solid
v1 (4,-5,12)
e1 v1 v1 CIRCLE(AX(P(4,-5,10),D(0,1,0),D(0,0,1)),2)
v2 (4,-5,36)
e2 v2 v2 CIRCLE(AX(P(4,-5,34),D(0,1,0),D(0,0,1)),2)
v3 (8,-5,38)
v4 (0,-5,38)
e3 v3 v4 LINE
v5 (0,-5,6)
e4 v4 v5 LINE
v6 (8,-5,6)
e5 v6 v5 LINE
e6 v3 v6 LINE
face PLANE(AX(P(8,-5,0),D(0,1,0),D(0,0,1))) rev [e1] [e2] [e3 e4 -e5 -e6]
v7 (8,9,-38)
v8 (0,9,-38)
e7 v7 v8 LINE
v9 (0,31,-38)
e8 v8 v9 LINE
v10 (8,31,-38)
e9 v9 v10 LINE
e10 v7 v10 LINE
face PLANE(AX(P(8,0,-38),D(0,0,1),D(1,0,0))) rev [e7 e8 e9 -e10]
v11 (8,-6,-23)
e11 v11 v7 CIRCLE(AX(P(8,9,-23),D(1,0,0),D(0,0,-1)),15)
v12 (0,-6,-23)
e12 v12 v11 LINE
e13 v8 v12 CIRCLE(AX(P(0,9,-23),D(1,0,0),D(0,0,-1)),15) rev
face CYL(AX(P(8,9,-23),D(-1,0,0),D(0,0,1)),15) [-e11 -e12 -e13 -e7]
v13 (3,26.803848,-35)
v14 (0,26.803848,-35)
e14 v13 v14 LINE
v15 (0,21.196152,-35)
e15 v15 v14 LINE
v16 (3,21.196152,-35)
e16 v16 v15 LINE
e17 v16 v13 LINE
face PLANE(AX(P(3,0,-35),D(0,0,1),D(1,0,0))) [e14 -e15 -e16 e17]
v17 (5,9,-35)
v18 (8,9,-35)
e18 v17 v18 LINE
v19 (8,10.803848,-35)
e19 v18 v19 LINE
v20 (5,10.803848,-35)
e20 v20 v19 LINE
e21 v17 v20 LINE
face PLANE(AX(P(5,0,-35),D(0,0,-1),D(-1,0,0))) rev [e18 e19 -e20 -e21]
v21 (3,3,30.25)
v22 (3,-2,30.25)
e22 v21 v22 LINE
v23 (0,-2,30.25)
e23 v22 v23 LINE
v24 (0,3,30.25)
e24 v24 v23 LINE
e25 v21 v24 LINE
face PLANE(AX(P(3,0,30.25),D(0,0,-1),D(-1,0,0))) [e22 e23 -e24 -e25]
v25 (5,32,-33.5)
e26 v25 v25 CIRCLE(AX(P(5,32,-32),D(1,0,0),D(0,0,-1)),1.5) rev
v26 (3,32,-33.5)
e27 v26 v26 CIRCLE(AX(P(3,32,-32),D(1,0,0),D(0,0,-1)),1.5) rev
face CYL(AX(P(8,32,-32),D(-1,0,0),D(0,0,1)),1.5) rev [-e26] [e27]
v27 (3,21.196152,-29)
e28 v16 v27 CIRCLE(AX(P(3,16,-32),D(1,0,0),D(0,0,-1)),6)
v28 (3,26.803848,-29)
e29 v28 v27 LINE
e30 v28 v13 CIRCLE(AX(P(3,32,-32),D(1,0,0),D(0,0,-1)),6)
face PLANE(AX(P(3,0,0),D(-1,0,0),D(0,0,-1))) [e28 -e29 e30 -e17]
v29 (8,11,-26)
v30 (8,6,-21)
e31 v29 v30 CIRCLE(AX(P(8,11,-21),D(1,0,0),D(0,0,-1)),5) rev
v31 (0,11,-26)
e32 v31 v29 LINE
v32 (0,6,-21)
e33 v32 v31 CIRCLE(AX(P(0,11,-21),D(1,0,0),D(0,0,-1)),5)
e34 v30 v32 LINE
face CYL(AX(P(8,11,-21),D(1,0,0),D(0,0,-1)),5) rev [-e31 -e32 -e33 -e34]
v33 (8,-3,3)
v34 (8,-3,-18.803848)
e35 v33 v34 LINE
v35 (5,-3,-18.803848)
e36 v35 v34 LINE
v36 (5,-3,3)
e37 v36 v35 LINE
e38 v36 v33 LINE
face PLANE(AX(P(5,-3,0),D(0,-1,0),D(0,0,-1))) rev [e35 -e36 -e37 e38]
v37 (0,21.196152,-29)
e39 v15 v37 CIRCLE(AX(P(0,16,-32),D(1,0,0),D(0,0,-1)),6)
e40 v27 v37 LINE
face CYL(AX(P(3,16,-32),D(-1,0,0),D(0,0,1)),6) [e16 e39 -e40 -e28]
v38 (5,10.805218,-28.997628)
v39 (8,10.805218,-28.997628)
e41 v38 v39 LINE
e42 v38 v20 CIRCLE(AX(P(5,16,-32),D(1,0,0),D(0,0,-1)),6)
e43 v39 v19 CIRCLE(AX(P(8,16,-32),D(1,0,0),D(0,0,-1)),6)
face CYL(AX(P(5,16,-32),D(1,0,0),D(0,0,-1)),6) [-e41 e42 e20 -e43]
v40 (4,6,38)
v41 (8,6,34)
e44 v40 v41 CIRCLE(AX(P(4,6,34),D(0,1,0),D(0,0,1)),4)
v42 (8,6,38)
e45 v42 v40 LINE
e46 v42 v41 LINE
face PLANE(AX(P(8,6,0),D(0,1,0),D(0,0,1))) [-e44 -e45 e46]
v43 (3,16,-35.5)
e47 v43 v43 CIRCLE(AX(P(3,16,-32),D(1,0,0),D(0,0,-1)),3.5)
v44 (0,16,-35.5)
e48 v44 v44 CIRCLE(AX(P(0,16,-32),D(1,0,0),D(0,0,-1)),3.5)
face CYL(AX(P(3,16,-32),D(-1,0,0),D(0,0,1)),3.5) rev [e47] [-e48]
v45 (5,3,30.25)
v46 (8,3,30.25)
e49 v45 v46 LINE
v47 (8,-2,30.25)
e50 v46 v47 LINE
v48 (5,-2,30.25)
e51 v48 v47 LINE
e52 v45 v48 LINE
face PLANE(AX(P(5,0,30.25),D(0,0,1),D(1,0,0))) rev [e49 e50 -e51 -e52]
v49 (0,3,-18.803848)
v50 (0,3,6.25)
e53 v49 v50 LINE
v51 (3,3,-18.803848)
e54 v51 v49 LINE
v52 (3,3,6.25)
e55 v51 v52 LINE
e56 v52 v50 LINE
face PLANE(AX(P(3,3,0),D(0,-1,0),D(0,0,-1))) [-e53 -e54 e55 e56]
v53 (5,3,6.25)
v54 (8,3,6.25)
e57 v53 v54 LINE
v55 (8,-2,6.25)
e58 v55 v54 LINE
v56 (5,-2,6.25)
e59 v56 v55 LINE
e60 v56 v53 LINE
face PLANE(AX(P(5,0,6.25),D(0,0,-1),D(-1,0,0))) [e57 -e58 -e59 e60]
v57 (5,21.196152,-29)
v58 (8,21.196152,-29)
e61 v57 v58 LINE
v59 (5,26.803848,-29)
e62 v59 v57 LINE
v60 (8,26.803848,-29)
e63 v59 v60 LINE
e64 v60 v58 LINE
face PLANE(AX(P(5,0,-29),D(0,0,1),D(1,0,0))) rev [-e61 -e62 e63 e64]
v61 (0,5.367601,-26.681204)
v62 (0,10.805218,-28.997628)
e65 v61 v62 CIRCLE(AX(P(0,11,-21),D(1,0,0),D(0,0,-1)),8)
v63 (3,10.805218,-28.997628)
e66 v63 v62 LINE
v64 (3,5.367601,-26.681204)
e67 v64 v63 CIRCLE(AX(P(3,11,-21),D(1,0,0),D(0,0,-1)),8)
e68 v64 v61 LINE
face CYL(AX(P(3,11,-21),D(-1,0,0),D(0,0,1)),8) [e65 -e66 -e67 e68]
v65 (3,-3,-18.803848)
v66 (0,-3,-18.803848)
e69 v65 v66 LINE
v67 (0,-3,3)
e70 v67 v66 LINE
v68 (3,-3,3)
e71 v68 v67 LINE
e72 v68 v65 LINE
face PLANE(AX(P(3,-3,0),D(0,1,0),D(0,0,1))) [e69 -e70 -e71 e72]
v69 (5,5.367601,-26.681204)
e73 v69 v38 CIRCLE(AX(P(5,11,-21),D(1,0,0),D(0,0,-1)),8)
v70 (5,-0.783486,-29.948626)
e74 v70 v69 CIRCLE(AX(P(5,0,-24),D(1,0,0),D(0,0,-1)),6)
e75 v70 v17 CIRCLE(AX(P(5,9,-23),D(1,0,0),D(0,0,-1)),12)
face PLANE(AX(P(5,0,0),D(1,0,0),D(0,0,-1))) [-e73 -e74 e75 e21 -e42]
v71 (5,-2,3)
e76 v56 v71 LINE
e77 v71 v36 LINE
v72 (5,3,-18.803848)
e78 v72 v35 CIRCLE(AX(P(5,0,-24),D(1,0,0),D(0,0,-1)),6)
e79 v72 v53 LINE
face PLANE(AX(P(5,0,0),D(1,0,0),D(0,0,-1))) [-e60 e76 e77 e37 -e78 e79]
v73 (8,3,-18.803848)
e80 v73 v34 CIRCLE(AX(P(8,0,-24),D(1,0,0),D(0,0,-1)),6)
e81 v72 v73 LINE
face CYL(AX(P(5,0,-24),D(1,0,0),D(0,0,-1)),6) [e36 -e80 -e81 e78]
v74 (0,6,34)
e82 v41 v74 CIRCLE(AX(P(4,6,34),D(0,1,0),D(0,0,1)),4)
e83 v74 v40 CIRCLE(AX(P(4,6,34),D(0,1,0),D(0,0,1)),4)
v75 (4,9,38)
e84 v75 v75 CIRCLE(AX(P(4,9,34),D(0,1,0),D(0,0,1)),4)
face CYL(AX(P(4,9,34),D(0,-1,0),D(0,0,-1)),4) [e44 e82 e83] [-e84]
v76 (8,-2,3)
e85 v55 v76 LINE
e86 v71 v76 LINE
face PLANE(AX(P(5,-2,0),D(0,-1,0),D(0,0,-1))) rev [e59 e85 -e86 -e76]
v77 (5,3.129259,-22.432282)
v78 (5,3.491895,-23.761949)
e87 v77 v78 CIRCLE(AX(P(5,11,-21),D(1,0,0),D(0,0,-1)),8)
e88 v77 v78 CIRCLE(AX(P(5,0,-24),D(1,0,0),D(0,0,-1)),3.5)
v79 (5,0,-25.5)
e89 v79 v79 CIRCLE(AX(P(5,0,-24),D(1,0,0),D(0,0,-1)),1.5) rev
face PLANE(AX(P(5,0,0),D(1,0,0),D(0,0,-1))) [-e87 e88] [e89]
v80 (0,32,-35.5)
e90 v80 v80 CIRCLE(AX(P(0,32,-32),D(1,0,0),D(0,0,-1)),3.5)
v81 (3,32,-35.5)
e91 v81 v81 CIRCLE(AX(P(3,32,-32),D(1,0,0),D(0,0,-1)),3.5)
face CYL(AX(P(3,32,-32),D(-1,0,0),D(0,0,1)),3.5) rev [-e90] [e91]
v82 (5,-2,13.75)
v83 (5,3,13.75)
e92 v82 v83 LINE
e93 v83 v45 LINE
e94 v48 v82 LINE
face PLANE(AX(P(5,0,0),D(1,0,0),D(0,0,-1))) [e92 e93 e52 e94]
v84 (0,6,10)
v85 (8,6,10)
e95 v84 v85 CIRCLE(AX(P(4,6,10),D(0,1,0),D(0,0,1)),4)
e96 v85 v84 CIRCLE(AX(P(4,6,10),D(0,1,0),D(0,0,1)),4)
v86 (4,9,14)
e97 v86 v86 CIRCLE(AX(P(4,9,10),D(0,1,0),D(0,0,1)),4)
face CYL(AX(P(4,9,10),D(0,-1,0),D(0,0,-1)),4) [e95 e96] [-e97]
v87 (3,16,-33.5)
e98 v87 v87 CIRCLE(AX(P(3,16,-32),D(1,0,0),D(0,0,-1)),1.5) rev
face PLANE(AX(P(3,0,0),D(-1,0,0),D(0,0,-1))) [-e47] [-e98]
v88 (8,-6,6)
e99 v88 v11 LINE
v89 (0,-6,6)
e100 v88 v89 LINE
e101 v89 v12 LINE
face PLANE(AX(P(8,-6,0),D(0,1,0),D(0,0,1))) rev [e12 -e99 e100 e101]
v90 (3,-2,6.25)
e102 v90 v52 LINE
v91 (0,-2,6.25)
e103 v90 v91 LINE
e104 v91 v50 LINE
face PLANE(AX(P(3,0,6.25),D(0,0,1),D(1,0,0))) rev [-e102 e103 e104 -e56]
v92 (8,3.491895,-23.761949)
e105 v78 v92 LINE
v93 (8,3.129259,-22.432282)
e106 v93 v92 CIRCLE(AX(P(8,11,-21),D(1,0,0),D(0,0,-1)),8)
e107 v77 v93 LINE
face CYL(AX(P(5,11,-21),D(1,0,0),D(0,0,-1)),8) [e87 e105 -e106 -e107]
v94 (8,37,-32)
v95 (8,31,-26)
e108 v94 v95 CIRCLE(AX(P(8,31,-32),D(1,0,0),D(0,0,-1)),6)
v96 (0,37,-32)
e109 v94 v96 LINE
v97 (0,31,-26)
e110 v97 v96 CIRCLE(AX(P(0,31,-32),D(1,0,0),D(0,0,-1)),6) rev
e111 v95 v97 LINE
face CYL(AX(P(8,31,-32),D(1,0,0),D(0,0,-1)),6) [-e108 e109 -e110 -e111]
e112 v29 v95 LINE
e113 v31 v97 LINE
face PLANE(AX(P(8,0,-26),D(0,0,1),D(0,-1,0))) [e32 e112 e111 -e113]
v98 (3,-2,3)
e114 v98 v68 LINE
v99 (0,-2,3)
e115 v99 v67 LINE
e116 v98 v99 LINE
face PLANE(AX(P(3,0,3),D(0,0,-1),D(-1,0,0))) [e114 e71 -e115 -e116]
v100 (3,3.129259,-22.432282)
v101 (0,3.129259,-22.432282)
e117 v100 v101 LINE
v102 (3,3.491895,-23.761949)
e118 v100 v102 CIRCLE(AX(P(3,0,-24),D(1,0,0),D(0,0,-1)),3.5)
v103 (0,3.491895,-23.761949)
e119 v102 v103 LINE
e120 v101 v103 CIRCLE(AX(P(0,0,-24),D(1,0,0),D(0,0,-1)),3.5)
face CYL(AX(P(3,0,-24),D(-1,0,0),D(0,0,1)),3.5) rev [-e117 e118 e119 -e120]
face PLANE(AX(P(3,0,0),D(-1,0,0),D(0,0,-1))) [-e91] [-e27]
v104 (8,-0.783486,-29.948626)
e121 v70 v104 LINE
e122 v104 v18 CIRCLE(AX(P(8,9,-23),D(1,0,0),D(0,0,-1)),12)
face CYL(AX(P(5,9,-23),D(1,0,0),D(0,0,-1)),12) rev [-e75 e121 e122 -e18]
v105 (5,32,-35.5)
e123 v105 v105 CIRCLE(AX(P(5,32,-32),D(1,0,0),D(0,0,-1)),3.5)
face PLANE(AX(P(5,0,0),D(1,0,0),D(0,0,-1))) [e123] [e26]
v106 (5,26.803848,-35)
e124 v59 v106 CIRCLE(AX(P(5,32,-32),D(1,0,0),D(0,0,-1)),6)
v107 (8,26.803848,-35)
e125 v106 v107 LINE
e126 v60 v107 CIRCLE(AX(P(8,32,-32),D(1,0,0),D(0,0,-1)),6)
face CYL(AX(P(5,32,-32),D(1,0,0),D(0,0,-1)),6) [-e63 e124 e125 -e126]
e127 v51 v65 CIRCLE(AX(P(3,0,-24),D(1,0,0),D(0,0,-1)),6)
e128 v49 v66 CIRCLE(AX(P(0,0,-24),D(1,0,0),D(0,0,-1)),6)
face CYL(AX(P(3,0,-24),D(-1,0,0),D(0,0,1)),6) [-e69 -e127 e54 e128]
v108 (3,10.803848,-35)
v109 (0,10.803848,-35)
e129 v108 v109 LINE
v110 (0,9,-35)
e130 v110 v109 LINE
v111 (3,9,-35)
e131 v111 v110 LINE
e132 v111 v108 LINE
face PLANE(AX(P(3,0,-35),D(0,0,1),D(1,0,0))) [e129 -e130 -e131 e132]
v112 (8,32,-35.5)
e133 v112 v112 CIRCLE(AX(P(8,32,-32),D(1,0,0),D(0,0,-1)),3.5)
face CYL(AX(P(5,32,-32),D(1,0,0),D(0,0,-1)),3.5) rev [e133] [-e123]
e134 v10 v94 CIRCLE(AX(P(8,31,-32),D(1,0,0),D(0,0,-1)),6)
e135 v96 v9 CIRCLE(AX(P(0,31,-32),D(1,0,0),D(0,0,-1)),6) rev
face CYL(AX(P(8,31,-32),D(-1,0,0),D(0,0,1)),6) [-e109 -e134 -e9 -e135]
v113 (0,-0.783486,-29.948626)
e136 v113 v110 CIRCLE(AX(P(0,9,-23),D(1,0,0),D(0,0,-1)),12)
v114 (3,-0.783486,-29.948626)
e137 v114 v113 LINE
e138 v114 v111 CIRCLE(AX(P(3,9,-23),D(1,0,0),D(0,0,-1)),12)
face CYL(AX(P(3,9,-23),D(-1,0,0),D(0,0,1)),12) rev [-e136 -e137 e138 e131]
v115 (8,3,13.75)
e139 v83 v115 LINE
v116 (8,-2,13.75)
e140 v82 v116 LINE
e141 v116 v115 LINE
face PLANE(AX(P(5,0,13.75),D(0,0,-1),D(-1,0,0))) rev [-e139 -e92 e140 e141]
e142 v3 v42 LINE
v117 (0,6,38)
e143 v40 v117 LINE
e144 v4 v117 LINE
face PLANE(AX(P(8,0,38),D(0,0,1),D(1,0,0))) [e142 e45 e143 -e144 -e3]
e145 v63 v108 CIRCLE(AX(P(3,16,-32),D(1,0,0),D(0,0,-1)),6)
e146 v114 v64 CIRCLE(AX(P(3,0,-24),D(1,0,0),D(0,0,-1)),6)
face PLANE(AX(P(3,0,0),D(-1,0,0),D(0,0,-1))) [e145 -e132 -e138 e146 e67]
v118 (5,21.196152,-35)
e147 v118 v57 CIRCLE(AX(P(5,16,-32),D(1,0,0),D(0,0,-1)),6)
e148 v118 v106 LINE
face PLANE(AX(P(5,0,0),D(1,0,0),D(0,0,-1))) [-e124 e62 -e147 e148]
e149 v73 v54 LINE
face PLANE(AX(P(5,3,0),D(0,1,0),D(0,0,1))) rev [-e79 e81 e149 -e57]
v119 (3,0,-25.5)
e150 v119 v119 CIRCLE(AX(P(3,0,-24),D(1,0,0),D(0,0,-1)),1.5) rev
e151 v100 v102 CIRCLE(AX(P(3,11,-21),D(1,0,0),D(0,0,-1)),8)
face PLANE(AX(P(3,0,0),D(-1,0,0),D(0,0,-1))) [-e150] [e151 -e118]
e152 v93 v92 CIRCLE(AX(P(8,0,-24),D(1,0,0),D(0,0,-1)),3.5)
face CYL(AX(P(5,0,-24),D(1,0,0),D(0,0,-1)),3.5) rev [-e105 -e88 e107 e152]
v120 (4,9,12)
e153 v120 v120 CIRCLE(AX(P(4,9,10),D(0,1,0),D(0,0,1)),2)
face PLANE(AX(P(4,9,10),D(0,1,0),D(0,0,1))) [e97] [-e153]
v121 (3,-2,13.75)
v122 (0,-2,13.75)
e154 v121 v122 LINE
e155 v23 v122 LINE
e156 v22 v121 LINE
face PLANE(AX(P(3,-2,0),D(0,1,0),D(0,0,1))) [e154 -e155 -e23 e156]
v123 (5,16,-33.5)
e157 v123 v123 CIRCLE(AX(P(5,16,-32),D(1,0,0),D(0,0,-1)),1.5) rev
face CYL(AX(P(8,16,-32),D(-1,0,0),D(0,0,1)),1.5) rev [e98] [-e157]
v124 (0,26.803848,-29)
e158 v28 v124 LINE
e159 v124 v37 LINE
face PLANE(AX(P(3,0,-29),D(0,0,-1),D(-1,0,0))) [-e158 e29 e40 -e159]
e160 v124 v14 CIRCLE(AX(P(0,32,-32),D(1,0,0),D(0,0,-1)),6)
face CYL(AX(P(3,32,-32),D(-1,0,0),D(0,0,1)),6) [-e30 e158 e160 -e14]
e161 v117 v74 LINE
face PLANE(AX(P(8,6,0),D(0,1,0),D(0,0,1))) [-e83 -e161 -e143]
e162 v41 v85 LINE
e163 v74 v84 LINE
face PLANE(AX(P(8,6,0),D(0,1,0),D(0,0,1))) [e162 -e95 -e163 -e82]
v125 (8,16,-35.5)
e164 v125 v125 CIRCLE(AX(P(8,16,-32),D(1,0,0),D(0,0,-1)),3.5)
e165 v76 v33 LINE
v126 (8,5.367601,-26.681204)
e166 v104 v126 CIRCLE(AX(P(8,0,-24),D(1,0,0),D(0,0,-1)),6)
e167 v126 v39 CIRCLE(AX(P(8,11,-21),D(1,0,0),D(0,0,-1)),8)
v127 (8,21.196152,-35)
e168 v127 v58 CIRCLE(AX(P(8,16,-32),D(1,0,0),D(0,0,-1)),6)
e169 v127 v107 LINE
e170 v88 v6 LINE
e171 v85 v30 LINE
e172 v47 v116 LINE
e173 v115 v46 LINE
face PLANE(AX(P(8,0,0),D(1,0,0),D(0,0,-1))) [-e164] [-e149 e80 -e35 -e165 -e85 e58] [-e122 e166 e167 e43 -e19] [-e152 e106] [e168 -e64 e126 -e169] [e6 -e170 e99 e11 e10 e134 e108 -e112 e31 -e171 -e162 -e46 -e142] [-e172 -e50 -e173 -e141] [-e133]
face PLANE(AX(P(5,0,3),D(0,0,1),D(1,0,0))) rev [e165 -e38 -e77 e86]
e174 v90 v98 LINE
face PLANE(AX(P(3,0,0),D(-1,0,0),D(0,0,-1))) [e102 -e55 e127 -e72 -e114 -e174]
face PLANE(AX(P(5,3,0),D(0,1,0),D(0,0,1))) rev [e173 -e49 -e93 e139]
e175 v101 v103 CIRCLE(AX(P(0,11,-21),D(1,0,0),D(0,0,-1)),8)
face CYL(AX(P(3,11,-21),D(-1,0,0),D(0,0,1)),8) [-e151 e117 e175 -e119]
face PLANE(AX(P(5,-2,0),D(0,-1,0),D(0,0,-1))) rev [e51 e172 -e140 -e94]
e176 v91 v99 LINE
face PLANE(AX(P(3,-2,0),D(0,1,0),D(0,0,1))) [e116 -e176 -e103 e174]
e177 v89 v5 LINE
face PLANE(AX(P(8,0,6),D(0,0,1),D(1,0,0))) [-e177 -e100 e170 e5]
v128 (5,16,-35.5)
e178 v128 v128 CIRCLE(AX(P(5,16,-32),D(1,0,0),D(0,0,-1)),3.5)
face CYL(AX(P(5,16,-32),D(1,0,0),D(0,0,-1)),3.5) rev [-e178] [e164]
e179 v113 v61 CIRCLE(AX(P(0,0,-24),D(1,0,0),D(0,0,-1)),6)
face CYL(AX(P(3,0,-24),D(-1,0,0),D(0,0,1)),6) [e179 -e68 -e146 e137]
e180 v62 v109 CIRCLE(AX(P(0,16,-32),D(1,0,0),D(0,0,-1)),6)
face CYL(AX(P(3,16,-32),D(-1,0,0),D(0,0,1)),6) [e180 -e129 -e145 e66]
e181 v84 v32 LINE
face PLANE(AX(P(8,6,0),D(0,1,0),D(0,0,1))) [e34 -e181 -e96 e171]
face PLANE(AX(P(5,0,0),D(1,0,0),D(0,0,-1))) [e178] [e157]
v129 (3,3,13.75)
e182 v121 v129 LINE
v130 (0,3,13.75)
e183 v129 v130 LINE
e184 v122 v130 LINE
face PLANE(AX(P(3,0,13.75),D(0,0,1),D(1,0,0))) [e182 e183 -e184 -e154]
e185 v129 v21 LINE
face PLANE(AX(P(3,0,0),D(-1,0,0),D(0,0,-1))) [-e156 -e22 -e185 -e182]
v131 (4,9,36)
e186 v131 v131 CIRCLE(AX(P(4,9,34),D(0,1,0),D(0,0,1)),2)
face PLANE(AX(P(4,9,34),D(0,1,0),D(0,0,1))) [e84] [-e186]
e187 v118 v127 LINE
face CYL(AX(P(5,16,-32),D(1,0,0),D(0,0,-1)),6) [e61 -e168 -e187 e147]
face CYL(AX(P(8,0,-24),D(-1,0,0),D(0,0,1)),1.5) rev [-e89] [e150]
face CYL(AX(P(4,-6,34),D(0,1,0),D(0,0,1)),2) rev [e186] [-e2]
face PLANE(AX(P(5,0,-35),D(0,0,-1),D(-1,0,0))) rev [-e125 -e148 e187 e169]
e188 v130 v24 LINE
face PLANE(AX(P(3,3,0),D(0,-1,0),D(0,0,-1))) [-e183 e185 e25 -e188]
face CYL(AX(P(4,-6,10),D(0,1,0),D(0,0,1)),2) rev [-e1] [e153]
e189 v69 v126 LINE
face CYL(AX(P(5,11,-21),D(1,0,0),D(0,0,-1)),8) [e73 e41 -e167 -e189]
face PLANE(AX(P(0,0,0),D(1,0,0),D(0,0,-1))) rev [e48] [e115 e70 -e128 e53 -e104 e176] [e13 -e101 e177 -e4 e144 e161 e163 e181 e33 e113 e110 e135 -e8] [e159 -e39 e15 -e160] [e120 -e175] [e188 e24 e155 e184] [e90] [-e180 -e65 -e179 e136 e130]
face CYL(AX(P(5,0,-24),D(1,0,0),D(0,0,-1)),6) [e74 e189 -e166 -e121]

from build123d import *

# Parameters (mm, degrees)
SKETCH1_R           = 1.5
SKETCH1_W           = 12
SKETCH1_H           = 31
BOSS_EXTRUDE1_DEPTH = 8
FILLET1_R           = 6
FILLET2_R           = 15
FILLET3_R           = 5
SKETCH2_R           = 2
CUT_EXTRUDE1_DEPTH  = 50.689032995
BOSS_EXTRUDE2_START = 3
SKETCH3_R           = 4
SKETCH3_R_2         = 2
BOSS_EXTRUDE2_DEPTH = 3
CUT_EXTRUDE2_START  = -3
SKETCH4_W           = 16.5
SKETCH4_H           = 5
SKETCH4_R           = 1.5
CUT_EXTRUDE2_DEPTH  = 3


with BuildPart() as part:
    # Sketch1 → Boss-Extrude1 (new body)
    # profile 1 of 2: a face of its own
    with BuildSketch(Plane(origin=(0, 0, 0), x_dir=(0, 0, -1), z_dir=(1, 0, 0))):
        Polygon((-6, -5), (-6, -6), (38, -6), (38, 6), (26, 6), (-38, 6), (-38, -5), align=None)
        with Locations((24, 0)):
            Circle(SKETCH1_R, mode=Mode.SUBTRACT)
    # profile 2 of 2: a face of its own
    with BuildSketch(Plane(origin=(0, 0, 0), x_dir=(0, 0, -1), z_dir=(1, 0, 0))):
        with Locations((32, 21.5)):
            Rectangle(SKETCH1_W, SKETCH1_H)
        with Locations((32, 16)):
            Circle(SKETCH1_R, mode=Mode.SUBTRACT)
        with Locations((32, 32)):
            Circle(SKETCH1_R, mode=Mode.SUBTRACT)
    extrude(amount=BOSS_EXTRUDE1_DEPTH)

    # Fillet1
    fillet1_edges = [part.edges().sort_by_distance(p)[0] for p in [
        (4, 37, -26),
        (4, 37, -38),
    ]]
    fillet(fillet1_edges, radius=FILLET1_R - 0.0001)  # a hair under: the kernel refuses the full size

    # Fillet2
    fillet2_edges = [part.edges().sort_by_distance(p)[0] for p in [
        (4, -6, -38),
    ]]
    fillet(fillet2_edges, radius=FILLET2_R)

    # Fillet3
    fillet3_edges = [part.edges().sort_by_distance(p)[0] for p in [
        (4, 6, -26),
    ]]
    fillet(fillet3_edges, radius=FILLET3_R)

    # Sketch2 → Cut-Extrude1 (cut, through all)
    with BuildSketch(Plane(origin=(0, 6, 0), x_dir=(1, 0, 0), z_dir=(0, 1, 0))):
        with Locations(Location((4, -34, 0), (0, 0, 270))):
            Circle(SKETCH2_R)
        with Locations(Location((4, -10, 0), (0, 0, 270))):
            Circle(SKETCH2_R)
    extrude(amount=-CUT_EXTRUDE1_DEPTH, mode=Mode.SUBTRACT)

    # Sketch3 → Boss-Extrude2 (add)
    # profile 1 of 2: a face of its own
    with BuildSketch(Plane(origin=(0, 6, 0), x_dir=(1, 0, 0), z_dir=(0, 1, 0)).offset(BOSS_EXTRUDE2_START)):
        with Locations(Location((4, -10, 0), (0, 0, 180))):
            Circle(SKETCH3_R)
        with Locations(Location((4, -10, 0), (0, 0, 270))):
            Circle(SKETCH3_R_2, mode=Mode.SUBTRACT)
    # profile 2 of 2: a face of its own
    with BuildSketch(Plane(origin=(0, 6, 0), x_dir=(1, 0, 0), z_dir=(0, 1, 0)).offset(BOSS_EXTRUDE2_START)):
        with Locations(Location((4, -34, 0), (0, 0, 270))):
            Circle(SKETCH3_R)
        with Locations(Location((4, -34, 0), (0, 0, 270))):
            Circle(SKETCH3_R_2, mode=Mode.SUBTRACT)
    extrude(amount=-BOSS_EXTRUDE2_DEPTH)

    # Sketch4 → Cut-Extrude2 (cut)
    # profile 1 of 11: a face of its own
    with BuildSketch(Plane(origin=(8, 0, 0), x_dir=(0, 0, -1), z_dir=(1, 0, 0)).offset(CUT_EXTRUDE2_START)):
        with BuildLine():
            Line((-6.25, 3), (-6.25, -2))
            Line((-6.25, -2), (-3, -2))
            Line((-3, -2), (-3, -3))
            Line((-3, -3), (18.803847577, -3))
            ThreePointArc((18.803847577, -3), (18, 0), (18.803847577, 3))
            Line((18.803847577, 3), (-6.25, 3))
        make_face()
    # profile 2 of 11: a face of its own
    with BuildSketch(Plane(origin=(8, 0, 0), x_dir=(0, 0, -1), z_dir=(1, 0, 0)).offset(CUT_EXTRUDE2_START)):
        with Locations((-22, 0.5)):
            Rectangle(SKETCH4_W, SKETCH4_H)
    # profile 3 of 11: a face of its own
    with BuildSketch(Plane(origin=(8, 0, 0), x_dir=(0, 0, -1), z_dir=(1, 0, 0)).offset(CUT_EXTRUDE2_START)):
        with BuildLine():
            ThreePointArc((28.997628386, 10.805217551), (28.359995566, 7.86464272), (26.681204439, 5.367601211))
            ThreePointArc((26.681204439, 5.367601211), (29.103294359, 3.155374254), (30, 0))
            ThreePointArc((30, 0), (29.98714269, -0.392584271), (29.948625864, -0.783486015))
            ThreePointArc((29.948625864, -0.783486015), (33.662633595, 3.494707563), (35, 9))
            Line((35, 9), (35, 10.803847577))
            ThreePointArc((35, 10.803847577), (31.998630567, 10.000000156), (28.997628386, 10.805217551))
        make_face()
    # profile 4 of 11: a face of its own
    with BuildSketch(Plane(origin=(8, 0, 0), x_dir=(0, 0, -1), z_dir=(1, 0, 0)).offset(CUT_EXTRUDE2_START)):
        with BuildLine():
            Line((29, 26.803847577), (29, 21.196152423))
            ThreePointArc((29, 21.196152423), (32, 22), (35, 21.196152423))
            Line((35, 21.196152423), (35, 26.803847577))
            ThreePointArc((35, 26.803847577), (32, 26), (29, 26.803847577))
        make_face()
    # profile 5 of 11: a face of its own
    with BuildSketch(Plane(origin=(8, 0, 0), x_dir=(0, 0, -1), z_dir=(1, 0, 0)).offset(CUT_EXTRUDE2_START)):
        with BuildLine():
            Line((29, 31), (29, 30.197224362))
            ThreePointArc((29, 30.197224362), (32, 28.5), (35, 30.197224362))
            Line((35, 30.197224362), (35, 31))
            ThreePointArc((35, 31), (34.121320344, 33.121320344), (32, 34))
            ThreePointArc((32, 34), (29.878679656, 33.121320344), (29, 31))
        make_face()
        with Locations((32, 32)):
            Circle(SKETCH4_R, mode=Mode.SUBTRACT)
    # profile 6 of 11: a face of its own
    with BuildSketch(Plane(origin=(8, 0, 0), x_dir=(0, 0, -1), z_dir=(1, 0, 0)).offset(CUT_EXTRUDE2_START)):
        with BuildLine():
            ThreePointArc((35.5, 32), (31.064585653, 35.372684391), (29, 30.197224362))
            Line((29, 30.197224362), (29, 31))
            ThreePointArc((29, 31), (29.878679656, 33.121320344), (32, 34))
            ThreePointArc((32, 34), (34.121320344, 33.121320344), (35, 31))
            Line((35, 31), (35, 30.197224362))
            ThreePointArc((35, 30.197224362), (35.372684391, 31.064585653), (35.5, 32))
        make_face()
    # profile 7 of 11: a face of its own
    with BuildSketch(Plane(origin=(8, 0, 0), x_dir=(0, 0, -1), z_dir=(1, 0, 0)).offset(CUT_EXTRUDE2_START)):
        with BuildLine():
            ThreePointArc((35, 17.802775638), (32, 19.5), (29, 17.802775638))
            Line((29, 17.802775638), (29, 14.197224362))
            ThreePointArc((29, 14.197224362), (32, 12.5), (35, 14.197224362))
            Line((35, 14.197224362), (35, 17.802775638))
        make_face()
        with Locations((32, 16)):
            Circle(SKETCH4_R, mode=Mode.SUBTRACT)
    # profile 8 of 11: a face of its own
    with BuildSketch(Plane(origin=(8, 0, 0), x_dir=(0, 0, -1), z_dir=(1, 0, 0)).offset(CUT_EXTRUDE2_START)):
        with BuildLine():
            Line((35, 17.802775638), (35, 14.197224362))
            ThreePointArc((35, 14.197224362), (35.372684391, 15.064585653), (35.5, 16))
            ThreePointArc((35.5, 16), (35.372684391, 16.935414347), (35, 17.802775638))
        make_face()
    # profile 9 of 11: a face of its own
    with BuildSketch(Plane(origin=(8, 0, 0), x_dir=(0, 0, -1), z_dir=(1, 0, 0)).offset(CUT_EXTRUDE2_START)):
        with BuildLine():
            Line((29, 14.197224362), (29, 17.802775638))
            ThreePointArc((29, 17.802775638), (28.5, 16), (29, 14.197224362))
        make_face()
    # profile 10 of 11: a face of its own
    with BuildSketch(Plane(origin=(8, 0, 0), x_dir=(0, 0, -1), z_dir=(1, 0, 0)).offset(CUT_EXTRUDE2_START)):
        with BuildLine():
            ThreePointArc((23.761948832, 3.491895136), (23.104939246, 3.28188943), (22.432281937, 3.12925871))
            ThreePointArc((22.432281937, 3.12925871), (20.50257094, 0.134126691), (22.197224362, -3))
            Line((22.197224362, -3), (23, -3))
            ThreePointArc((23, -3), (24.748137439, -2.87198448), (26.458976757, -2.490669249))
            ThreePointArc((26.458976757, -2.490669249), (27.229273808, -1.349737262), (27.5, 0))
            ThreePointArc((27.5, 0), (26.389228004, 2.557653132), (23.761948832, 3.491895136))
        make_face()
        with Locations((24, 0)):
            Circle(SKETCH4_R, mode=Mode.SUBTRACT)
    # profile 11 of 11: a face of its own
    with BuildSketch(Plane(origin=(8, 0, 0), x_dir=(0, 0, -1), z_dir=(1, 0, 0)).offset(CUT_EXTRUDE2_START)):
        with BuildLine():
            Line((23, -3), (22.197224362, -3))
            ThreePointArc((22.197224362, -3), (24.415336527, -3.475269136), (26.458976757, -2.490669249))
            ThreePointArc((26.458976757, -2.490669249), (24.748137439, -2.87198448), (23, -3))
        make_face()
    cut_extrude2 = extrude(amount=CUT_EXTRUDE2_DEPTH, mode=Mode.SUBTRACT)

    # Mirror1: Cut-Extrude2 across plane
    add(cut_extrude2.mirror(Plane.ZY.offset(-4)), mode=Mode.SUBTRACT)


solid = part.part
